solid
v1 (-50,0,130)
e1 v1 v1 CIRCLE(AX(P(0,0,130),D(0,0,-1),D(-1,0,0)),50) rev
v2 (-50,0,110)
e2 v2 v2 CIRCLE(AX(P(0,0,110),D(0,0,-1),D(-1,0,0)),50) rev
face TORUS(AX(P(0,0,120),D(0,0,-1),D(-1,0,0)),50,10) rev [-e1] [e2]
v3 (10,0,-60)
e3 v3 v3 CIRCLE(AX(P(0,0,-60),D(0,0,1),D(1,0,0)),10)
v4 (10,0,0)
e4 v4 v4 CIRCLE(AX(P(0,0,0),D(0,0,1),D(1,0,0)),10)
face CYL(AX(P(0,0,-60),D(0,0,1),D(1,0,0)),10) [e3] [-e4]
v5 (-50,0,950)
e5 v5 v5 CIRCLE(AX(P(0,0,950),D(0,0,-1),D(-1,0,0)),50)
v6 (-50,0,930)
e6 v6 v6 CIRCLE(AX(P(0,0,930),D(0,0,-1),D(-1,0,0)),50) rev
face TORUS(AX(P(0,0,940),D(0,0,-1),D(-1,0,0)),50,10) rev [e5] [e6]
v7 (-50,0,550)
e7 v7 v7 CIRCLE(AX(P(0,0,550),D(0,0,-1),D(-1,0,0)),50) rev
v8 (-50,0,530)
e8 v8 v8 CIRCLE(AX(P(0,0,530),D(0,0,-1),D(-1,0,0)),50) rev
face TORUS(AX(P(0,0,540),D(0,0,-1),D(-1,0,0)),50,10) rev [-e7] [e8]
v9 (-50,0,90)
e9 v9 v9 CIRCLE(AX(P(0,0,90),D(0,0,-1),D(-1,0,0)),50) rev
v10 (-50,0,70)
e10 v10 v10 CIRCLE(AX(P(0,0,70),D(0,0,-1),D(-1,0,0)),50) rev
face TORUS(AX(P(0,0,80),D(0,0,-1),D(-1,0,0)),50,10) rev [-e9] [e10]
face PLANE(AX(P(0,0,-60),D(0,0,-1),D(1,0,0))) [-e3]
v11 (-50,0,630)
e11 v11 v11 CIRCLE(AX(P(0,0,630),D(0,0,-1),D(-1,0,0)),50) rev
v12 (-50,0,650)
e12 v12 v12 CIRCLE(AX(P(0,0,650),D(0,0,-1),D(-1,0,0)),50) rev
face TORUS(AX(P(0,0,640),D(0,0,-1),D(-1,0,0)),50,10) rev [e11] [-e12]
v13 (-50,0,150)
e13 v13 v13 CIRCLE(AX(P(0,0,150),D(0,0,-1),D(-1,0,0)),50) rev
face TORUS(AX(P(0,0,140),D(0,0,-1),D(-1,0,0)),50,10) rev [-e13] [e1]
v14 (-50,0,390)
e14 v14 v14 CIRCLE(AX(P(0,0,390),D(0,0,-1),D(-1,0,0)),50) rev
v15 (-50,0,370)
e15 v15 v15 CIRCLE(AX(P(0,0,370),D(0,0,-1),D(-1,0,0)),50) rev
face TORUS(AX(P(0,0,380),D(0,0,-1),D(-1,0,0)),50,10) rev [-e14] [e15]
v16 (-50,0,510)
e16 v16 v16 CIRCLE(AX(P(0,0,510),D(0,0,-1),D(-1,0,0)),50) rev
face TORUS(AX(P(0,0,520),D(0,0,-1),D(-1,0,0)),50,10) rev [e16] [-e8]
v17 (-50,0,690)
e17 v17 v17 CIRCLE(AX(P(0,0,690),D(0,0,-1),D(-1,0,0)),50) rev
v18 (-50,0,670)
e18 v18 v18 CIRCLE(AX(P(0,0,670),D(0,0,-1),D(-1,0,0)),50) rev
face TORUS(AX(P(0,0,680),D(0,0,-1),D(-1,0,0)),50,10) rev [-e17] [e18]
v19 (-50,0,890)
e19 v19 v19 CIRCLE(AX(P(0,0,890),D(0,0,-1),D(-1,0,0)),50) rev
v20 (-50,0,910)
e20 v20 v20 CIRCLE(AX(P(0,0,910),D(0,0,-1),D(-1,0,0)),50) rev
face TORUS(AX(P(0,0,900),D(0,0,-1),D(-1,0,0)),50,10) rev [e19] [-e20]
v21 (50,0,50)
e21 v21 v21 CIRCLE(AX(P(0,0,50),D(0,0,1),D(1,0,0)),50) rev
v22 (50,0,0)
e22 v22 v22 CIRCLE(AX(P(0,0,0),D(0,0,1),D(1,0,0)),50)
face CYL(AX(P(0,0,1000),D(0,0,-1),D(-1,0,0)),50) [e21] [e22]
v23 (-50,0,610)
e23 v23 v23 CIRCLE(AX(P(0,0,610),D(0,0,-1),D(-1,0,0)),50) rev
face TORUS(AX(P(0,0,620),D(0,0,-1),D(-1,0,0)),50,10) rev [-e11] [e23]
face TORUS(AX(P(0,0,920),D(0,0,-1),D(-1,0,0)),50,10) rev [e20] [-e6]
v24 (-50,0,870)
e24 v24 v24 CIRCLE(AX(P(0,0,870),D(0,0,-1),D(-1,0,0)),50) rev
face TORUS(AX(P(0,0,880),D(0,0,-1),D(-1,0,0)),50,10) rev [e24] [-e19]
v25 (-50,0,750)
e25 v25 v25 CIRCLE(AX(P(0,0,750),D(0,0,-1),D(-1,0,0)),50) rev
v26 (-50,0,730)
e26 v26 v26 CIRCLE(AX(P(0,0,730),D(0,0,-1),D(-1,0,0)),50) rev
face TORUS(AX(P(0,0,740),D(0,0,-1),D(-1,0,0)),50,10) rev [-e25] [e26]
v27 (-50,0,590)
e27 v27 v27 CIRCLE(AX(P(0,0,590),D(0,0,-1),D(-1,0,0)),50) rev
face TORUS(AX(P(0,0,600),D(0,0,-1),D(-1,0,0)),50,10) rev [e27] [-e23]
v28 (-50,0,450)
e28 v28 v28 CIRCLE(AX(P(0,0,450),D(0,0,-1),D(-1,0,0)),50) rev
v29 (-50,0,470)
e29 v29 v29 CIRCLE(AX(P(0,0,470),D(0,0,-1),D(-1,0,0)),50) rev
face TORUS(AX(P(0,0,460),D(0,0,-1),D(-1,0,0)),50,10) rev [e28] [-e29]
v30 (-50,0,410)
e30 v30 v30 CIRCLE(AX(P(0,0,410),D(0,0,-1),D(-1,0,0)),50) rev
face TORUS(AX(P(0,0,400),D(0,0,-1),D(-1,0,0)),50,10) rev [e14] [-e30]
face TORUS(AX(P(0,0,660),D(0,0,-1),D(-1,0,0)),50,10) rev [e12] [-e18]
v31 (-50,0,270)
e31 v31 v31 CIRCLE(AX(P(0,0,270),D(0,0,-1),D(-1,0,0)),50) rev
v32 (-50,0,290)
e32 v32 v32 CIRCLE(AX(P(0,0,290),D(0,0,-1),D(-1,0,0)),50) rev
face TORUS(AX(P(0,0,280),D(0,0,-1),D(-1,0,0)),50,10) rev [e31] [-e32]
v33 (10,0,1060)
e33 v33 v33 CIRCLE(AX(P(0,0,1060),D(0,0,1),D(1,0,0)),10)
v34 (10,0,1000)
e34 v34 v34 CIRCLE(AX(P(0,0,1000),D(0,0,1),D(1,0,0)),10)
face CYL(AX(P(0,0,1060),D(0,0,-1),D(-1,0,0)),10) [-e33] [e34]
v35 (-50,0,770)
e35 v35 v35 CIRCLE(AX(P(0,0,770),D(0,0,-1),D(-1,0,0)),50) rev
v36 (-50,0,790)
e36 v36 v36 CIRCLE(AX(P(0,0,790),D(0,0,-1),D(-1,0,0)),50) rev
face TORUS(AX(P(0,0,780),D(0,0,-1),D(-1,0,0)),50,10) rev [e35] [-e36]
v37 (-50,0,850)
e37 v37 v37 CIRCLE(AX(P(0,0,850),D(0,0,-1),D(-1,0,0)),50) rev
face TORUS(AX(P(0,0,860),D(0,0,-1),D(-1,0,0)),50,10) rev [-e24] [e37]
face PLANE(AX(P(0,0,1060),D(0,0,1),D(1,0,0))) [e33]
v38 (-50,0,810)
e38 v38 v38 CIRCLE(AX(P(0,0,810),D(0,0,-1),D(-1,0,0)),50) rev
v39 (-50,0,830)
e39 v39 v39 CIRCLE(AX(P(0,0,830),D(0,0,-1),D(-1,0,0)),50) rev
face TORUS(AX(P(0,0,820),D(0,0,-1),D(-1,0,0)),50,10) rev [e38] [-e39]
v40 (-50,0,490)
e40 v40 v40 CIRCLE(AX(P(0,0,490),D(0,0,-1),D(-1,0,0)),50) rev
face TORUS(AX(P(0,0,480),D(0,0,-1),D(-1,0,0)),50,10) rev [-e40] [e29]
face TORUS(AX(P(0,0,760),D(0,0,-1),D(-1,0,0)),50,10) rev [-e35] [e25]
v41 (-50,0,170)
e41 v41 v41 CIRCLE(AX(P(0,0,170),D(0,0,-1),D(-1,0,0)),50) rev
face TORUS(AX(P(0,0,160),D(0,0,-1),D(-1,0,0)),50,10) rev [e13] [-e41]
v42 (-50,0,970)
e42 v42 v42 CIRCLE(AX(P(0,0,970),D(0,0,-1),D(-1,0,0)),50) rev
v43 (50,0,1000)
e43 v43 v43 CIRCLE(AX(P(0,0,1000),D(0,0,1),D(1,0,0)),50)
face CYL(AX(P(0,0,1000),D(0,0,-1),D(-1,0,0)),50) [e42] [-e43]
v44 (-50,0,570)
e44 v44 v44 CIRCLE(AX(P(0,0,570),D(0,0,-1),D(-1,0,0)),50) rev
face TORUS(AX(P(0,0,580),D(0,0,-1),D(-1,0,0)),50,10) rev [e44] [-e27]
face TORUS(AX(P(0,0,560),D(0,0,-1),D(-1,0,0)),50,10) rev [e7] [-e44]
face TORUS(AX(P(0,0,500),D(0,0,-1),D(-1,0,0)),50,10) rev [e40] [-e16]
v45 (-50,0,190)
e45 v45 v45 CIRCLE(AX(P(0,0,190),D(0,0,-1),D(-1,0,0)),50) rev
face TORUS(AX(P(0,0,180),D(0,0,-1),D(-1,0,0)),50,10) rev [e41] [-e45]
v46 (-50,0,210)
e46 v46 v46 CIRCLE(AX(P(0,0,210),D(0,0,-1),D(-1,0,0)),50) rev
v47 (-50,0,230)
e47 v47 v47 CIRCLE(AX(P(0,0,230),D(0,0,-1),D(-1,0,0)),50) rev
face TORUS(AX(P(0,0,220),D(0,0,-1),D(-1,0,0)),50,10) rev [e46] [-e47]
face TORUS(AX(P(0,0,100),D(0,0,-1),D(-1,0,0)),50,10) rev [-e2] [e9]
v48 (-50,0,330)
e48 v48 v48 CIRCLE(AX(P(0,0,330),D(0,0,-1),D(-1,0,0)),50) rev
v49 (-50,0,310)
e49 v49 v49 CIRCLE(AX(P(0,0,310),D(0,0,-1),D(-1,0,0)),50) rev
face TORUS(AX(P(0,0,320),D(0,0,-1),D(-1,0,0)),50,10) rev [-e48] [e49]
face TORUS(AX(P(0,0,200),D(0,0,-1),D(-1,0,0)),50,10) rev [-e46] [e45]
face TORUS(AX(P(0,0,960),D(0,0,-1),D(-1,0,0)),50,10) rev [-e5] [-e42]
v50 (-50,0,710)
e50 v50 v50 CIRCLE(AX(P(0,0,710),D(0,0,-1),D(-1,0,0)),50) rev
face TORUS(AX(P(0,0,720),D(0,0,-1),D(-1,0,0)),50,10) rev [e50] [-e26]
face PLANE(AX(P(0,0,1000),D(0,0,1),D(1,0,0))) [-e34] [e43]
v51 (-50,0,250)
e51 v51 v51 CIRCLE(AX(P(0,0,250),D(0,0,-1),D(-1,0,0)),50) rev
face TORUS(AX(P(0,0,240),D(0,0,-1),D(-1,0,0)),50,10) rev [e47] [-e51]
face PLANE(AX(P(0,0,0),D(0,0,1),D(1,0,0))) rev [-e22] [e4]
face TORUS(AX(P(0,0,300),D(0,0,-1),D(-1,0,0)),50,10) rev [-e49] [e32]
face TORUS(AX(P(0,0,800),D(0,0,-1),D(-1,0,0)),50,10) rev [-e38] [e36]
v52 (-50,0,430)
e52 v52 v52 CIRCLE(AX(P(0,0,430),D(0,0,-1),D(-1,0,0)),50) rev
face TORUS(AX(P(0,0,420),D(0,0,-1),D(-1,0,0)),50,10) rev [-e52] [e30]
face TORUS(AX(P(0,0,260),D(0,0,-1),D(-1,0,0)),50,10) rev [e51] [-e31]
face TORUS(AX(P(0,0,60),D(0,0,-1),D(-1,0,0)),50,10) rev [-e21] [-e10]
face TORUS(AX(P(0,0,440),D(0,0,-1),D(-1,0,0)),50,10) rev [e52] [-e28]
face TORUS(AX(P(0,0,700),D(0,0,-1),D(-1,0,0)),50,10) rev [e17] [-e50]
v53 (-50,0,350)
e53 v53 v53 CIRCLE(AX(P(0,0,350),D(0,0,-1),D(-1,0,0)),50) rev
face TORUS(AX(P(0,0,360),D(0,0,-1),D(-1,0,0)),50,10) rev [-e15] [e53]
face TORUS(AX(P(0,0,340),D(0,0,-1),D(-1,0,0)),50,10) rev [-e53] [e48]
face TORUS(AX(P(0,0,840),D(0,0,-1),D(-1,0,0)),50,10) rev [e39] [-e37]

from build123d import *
from build123d.topology import SkipClean

# Parameters (mm, degrees)
SKETCH1_R           = 50
BOSS_EXTRUDE1_DEPTH = 1000
SKETCH2_R           = 10
SKETCH3_R           = 10
BOSS_EXTRUDE2_DEPTH = 60
LPATTERN4_COUNT     = 46
LPATTERN4_PITCH     = 20


with BuildPart() as part:
    # Sketch1 → Boss-Extrude1 (new body)
    with BuildSketch(Plane.XY):
        Circle(SKETCH1_R)
    extrude(amount=BOSS_EXTRUDE1_DEPTH)

    # Sketch2 → Cut-Revolve1 (revolve, cut)
    with BuildSketch(Plane(origin=(0, 0, 0), x_dir=(1, 0, 0), z_dir=(0, 1, 0))):
        with Locations((-50, -960)):
            Circle(SKETCH2_R)
    cut_revolve1 = revolve(axis=Axis((0, 0, 0), (0, 0, 1)), mode=Mode.SUBTRACT)

    # Sketch3 → Boss-Extrude2 (add)
    with BuildSketch(Plane.XY.offset(1000)):
        Circle(SKETCH3_R)
    boss_extrude2 = extrude(amount=BOSS_EXTRUDE2_DEPTH)

    # Mirror1: Boss-Extrude2 across plane
    add(boss_extrude2.mirror(Plane.XY.offset(500)))

    # LPattern4: Cut-Revolve1 ×46
    with SkipClean():  # the faces are left unmerged after this step: merging them gives an invalid solid
        with Locations(*[(0, 0, -i * LPATTERN4_PITCH) for i in range(1, LPATTERN4_COUNT)]):
            add(cut_revolve1, mode=Mode.SUBTRACT)
    add(part.part.scale(1), mode=Mode.REPLACE)  # the faces are merged on a copy


solid = part.part
